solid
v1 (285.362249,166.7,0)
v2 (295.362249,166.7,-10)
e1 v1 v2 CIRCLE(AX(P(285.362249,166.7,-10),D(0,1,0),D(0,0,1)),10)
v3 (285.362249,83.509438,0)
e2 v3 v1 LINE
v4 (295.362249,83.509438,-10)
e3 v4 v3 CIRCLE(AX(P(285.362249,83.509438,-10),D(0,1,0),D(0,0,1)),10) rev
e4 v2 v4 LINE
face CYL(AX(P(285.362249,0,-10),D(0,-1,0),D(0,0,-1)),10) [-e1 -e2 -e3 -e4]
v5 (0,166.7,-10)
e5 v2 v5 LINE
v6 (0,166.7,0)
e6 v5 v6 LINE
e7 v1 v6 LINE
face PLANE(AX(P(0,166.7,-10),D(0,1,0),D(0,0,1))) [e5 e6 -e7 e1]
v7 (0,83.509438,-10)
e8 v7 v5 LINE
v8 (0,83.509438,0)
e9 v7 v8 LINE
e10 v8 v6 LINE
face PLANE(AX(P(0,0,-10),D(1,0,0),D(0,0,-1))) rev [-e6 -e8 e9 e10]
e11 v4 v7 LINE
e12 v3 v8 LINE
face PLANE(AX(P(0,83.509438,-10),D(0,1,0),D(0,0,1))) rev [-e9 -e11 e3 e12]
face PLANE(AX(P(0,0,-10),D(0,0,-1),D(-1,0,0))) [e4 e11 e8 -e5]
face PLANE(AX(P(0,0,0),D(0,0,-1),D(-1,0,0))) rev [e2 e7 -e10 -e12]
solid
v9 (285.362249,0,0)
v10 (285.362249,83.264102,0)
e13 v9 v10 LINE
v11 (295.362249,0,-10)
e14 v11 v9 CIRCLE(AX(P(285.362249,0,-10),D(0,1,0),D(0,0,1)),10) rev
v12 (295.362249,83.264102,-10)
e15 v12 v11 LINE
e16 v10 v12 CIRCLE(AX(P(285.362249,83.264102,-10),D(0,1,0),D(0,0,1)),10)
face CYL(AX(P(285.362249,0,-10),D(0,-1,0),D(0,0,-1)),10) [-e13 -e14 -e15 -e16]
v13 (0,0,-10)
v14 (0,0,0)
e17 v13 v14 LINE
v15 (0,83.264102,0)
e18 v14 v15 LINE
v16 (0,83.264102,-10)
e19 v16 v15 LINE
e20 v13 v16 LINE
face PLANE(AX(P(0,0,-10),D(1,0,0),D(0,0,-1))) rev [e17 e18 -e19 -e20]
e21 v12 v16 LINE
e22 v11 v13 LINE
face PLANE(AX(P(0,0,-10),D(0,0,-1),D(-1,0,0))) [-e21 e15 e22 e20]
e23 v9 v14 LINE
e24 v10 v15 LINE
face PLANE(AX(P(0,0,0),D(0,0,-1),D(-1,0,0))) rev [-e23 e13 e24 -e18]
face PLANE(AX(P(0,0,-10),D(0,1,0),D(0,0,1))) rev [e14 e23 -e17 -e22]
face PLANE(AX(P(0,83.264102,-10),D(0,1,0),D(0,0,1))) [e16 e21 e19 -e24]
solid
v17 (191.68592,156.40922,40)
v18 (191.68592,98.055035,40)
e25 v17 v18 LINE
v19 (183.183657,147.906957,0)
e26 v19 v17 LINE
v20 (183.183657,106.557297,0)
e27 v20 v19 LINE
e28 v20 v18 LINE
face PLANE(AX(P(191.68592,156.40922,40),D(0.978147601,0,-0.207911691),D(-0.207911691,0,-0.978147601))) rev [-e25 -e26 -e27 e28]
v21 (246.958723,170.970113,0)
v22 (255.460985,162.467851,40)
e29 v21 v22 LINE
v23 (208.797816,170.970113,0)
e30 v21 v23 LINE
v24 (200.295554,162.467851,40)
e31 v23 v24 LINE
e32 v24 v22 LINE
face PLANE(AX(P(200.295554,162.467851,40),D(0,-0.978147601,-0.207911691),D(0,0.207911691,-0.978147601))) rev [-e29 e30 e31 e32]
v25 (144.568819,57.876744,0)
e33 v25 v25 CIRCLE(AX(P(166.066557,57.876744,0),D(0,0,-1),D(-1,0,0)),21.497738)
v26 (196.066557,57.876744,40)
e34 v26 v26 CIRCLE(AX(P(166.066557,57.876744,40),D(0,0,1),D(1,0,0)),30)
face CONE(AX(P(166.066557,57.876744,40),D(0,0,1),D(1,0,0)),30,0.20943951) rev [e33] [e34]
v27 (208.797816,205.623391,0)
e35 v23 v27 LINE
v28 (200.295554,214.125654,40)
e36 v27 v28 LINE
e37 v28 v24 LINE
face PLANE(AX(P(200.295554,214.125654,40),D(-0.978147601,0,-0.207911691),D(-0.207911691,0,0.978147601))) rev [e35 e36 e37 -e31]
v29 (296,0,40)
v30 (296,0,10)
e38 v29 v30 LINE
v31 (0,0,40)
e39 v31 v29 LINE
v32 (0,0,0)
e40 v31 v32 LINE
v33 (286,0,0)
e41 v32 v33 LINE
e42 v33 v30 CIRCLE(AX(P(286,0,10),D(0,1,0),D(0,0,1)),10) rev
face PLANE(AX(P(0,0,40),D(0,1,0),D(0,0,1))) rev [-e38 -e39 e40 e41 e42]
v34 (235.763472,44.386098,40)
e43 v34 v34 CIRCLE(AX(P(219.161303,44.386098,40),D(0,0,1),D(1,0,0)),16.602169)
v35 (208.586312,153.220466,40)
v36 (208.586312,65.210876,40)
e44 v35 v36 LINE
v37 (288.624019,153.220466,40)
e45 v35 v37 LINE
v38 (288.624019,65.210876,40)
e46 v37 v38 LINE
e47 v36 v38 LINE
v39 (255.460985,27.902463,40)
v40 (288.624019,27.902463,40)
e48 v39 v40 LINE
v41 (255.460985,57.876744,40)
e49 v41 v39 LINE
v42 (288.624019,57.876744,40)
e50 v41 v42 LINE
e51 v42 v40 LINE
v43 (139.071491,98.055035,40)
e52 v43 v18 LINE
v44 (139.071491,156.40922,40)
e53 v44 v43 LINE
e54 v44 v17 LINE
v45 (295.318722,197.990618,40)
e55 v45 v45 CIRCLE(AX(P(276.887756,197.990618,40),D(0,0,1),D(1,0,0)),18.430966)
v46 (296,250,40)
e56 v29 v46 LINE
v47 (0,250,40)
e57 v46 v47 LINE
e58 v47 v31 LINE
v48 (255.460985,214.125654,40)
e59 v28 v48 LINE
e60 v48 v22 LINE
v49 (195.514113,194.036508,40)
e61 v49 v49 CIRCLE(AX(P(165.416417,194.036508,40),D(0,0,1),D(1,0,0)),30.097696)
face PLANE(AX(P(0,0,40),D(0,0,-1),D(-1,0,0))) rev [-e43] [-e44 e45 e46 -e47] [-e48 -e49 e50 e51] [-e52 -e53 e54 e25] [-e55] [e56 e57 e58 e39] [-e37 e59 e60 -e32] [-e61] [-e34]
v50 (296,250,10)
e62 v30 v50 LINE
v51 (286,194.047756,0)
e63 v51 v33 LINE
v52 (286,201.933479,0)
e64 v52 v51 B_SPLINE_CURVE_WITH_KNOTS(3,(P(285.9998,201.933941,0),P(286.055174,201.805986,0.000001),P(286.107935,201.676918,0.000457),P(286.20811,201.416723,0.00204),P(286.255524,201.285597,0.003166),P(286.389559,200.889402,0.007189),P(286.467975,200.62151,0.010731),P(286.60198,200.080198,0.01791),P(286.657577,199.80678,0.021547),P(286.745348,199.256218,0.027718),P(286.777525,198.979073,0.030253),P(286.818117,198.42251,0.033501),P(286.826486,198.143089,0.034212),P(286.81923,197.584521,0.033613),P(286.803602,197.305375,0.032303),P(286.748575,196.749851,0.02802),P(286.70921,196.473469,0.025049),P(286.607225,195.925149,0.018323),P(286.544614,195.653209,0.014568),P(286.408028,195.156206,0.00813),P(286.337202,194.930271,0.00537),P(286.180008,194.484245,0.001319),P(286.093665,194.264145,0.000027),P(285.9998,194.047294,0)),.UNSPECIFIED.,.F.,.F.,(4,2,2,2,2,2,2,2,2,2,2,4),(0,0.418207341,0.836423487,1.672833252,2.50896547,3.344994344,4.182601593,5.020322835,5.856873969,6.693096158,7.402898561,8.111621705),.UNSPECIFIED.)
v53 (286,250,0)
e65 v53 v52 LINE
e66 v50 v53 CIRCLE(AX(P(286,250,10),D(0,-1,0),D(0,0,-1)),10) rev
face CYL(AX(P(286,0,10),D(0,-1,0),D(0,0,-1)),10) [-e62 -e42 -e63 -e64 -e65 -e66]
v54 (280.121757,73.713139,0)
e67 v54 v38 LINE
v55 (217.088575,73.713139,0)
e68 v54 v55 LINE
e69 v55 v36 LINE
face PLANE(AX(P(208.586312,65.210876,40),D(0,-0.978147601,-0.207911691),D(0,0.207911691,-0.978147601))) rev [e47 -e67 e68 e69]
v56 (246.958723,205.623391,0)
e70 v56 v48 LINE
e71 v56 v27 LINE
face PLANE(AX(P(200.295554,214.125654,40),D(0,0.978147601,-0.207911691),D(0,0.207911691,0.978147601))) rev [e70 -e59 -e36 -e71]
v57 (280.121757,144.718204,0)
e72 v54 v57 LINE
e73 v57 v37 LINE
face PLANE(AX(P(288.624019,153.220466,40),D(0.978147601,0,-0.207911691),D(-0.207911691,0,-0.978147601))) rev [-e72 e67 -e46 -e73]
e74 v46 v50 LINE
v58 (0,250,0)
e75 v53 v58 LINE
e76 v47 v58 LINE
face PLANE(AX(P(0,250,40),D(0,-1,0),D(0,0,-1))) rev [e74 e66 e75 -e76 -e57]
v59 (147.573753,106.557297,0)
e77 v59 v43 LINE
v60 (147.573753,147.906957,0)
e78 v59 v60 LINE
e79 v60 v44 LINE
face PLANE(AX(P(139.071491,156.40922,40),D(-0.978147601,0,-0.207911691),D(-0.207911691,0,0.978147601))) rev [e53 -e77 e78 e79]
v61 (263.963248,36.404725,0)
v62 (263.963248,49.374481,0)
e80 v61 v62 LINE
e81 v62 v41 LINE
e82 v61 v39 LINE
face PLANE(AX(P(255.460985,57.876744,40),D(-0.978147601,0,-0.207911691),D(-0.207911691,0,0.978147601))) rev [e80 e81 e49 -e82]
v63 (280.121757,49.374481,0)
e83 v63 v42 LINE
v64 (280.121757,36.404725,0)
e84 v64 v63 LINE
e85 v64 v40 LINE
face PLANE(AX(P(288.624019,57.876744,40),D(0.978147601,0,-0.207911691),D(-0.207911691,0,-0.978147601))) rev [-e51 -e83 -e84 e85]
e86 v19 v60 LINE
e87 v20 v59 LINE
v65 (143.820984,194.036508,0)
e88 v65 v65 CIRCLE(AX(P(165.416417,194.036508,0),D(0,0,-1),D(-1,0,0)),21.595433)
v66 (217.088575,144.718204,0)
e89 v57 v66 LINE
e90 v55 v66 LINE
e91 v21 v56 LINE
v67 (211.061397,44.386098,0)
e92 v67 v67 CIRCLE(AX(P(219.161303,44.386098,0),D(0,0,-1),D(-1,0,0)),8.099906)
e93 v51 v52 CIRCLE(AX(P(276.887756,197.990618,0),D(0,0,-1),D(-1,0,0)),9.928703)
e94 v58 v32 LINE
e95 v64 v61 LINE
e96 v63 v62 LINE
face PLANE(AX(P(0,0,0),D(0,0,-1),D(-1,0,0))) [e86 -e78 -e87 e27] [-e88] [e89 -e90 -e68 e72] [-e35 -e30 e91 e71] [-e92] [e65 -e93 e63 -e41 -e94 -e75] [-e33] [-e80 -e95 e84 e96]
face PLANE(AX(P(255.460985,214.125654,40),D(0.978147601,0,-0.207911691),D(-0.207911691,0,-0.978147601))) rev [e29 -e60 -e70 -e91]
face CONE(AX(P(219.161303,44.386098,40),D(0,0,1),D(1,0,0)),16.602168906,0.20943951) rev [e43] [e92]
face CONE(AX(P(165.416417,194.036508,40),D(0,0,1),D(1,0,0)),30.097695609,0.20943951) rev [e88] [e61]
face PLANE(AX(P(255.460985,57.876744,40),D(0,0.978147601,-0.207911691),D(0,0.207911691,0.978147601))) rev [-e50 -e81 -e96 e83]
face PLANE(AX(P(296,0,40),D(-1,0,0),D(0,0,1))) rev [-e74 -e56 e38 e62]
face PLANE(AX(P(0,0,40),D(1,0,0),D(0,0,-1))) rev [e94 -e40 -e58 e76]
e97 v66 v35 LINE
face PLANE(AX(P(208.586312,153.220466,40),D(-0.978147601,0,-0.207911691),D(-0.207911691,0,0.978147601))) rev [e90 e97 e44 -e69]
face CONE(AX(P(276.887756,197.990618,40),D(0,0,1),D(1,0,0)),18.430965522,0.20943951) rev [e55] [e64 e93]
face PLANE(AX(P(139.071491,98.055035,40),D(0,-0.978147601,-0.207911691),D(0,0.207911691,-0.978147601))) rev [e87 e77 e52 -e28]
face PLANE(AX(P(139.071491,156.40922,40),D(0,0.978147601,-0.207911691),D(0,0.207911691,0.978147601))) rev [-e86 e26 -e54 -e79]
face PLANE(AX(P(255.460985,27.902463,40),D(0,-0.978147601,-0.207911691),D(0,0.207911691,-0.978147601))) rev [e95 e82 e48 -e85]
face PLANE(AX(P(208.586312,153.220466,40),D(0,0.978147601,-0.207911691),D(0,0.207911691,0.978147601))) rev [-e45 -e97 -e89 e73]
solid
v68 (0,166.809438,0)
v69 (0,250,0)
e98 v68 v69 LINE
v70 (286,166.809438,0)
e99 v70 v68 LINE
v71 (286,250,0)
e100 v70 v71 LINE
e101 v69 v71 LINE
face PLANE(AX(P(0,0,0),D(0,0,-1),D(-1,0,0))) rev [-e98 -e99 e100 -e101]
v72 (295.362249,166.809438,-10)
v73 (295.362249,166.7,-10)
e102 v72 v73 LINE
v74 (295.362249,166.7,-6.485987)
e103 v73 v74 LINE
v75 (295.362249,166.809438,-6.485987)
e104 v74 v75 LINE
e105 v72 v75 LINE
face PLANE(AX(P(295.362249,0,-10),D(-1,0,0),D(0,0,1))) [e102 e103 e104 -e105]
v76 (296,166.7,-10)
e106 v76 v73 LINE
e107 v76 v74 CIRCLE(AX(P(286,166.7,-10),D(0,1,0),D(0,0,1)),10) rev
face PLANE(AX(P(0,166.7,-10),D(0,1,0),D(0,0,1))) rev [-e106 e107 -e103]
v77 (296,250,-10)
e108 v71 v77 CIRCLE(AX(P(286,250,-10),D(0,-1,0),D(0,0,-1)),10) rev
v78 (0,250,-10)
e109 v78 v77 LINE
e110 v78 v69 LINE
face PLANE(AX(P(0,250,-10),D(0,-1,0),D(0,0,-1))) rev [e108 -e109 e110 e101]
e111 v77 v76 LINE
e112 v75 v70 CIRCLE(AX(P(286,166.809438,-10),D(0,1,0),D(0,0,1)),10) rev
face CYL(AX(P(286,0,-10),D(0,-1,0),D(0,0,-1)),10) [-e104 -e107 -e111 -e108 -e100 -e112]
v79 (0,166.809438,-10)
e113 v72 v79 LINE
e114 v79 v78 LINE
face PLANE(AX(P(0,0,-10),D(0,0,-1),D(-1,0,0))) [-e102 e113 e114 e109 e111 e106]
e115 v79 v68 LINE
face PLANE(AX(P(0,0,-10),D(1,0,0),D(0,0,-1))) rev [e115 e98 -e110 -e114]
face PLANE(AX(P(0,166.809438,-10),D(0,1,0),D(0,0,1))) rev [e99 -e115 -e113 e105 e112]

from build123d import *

# Parameters (mm, degrees)
SKETCH2_W                    = 296
SKETCH2_H                    = 250
BOSS_EXTRUDE1_DEPTH          = 40
BOSS_EXTRUDE2_DEPTH          = 10
SKETCH4_W                    = 295.362249347
SKETCH4_H                    = 83.190562337
BOSS_EXTRUDE2_2_DEPTH        = 10
SKETCH4_H_2                  = 83.264102062
BOSS_EXTRUDE2_3_DEPTH        = 10
FILLET1_R                    = 10
FILLET4_R                    = 10
FILLET5_R                    = 10
FILLET6_R                    = 10
SKETCH8_R                    = 30.097695609
CUT_EXTRUDE1_DEPTH           = 45
CUT_EXTRUDE1_DRAFT           = -12
SKETCH8_R_2                  = 30
CUT_EXTRUDE1_PROFILE_2_DEPTH = 45
CUT_EXTRUDE1_PROFILE_2_DRAFT = -12
SKETCH8_R_3                  = 18.430965522
CUT_EXTRUDE1_PROFILE_3_DEPTH = 45
CUT_EXTRUDE1_PROFILE_3_DRAFT = -12
SKETCH8_R_4                  = 16.602168906
CUT_EXTRUDE1_PROFILE_4_DEPTH = 45
CUT_EXTRUDE1_PROFILE_4_DRAFT = -12
SKETCH8_W                    = 52.614428909
SKETCH8_H                    = 58.35418479
CUT_EXTRUDE1_PROFILE_5_DEPTH = 45
CUT_EXTRUDE1_PROFILE_5_DRAFT = -12
SKETCH8_W_2                  = 80.037707008
SKETCH8_H_2                  = 88.009590175
CUT_EXTRUDE1_PROFILE_6_DEPTH = 45
CUT_EXTRUDE1_PROFILE_6_DRAFT = -12
SKETCH8_W_3                  = 55.165431523
SKETCH8_H_3                  = 51.657802929
CUT_EXTRUDE1_PROFILE_7_DEPTH = 45
CUT_EXTRUDE1_PROFILE_7_DRAFT = -12
SKETCH8_W_4                  = 33.163033979
SKETCH8_H_4                  = 29.974280712
CUT_EXTRUDE1_PROFILE_8_DEPTH = 45
CUT_EXTRUDE1_PROFILE_8_DRAFT = -12


with BuildPart() as part:
    # Sketch2 → Boss-Extrude1 (new body)
    with BuildSketch(Plane.XY):
        with Locations((148, 125)):
            Rectangle(SKETCH2_W, SKETCH2_H)
    extrude(amount=BOSS_EXTRUDE1_DEPTH)

    # Fillet1
    fillet1_edges = [part.edges().sort_by_distance(p)[0] for p in [
        (296, 125, 0),
    ]]
    fillet(fillet1_edges, radius=FILLET1_R)


with BuildPart() as body_2:
    # Sketch4 → Boss-Extrude2 (new body)
    with BuildSketch(Plane(origin=(0, 0, 0), x_dir=(-1, 0, 0), z_dir=(0, 0, -1))):
        Polygon((0, 250), (-296, 250), (-296, 166.7), (-295.362249347, 166.7), (-295.362249347, 166.809437663), (0, 166.809437663), align=None)
    extrude(amount=BOSS_EXTRUDE2_DEPTH)

    # Fillet4
    fillet4_edges = [body_2.edges().sort_by_distance(p)[0] for p in [
        (296, 208.35, 0),
    ]]
    fillet(fillet4_edges, radius=FILLET4_R - 0.0001)  # a hair under: the kernel refuses the full size


with BuildPart() as body_3:
    # Sketch4 → Boss-Extrude2 2 (new body)
    with BuildSketch(Plane(origin=(0, 0, 0), x_dir=(-1, 0, 0), z_dir=(0, 0, -1))):
        with Locations((-147.681124674, 125.104718832)):
            Rectangle(SKETCH4_W, SKETCH4_H)
    extrude(amount=BOSS_EXTRUDE2_2_DEPTH)

    # Fillet5
    fillet5_edges = [body_3.edges().sort_by_distance(p)[0] for p in [
        (295.362249347, 125.104718832, 0),
    ]]
    fillet(fillet5_edges, radius=FILLET5_R - 0.0001)  # a hair under: the kernel refuses the full size


with BuildPart() as body_4:
    # Sketch4 → Boss-Extrude2 3 (new body)
    with BuildSketch(Plane(origin=(0, 0, 0), x_dir=(-1, 0, 0), z_dir=(0, 0, -1))):
        with Locations((-147.681124674, 41.632051031)):
            Rectangle(SKETCH4_W, SKETCH4_H_2)
    extrude(amount=BOSS_EXTRUDE2_3_DEPTH)

    # Fillet6
    fillet6_edges = [body_4.edges().sort_by_distance(p)[0] for p in [
        (295.362249347, 41.632051031, 0),
    ]]
    fillet(fillet6_edges, radius=FILLET6_R - 0.0001)  # a hair under: the kernel refuses the full size


with BuildPart() as cut_extrude1_tool:
    # Sketch8 → Cut-Extrude1 (with draft: the straight prism first)
    with BuildSketch(Plane.XY.offset(40)):
        with Locations((165.416417311, 194.036508235)):
            Circle(SKETCH8_R)
    extrude(amount=-CUT_EXTRUDE1_DEPTH)
    # Cut-Extrude1: the draft: its side faces are tilted about the plane it starts from
    cut_extrude1_sides = [cut_extrude1_tool.faces().sort_by_distance(p)[0] for p in [
        (135.318721702, 194.036508235, 17.5),
    ]]
    draft(cut_extrude1_sides, Plane.XY.offset(40), CUT_EXTRUDE1_DRAFT)


with BuildPart() as part_1:
    add(part.part)

    # Cut-Extrude1: cut by cut_extrude1_tool
    add(cut_extrude1_tool.part, mode=Mode.SUBTRACT)


with BuildPart() as cut_extrude1_profile_2_tool:
    # Sketch8 → Cut-Extrude1 profile 2 (with draft: the straight prism first)
    with BuildSketch(Plane.XY.offset(40)):
        with Locations((166.066556831, 57.876743725)):
            Circle(SKETCH8_R_2)
    extrude(amount=-CUT_EXTRUDE1_PROFILE_2_DEPTH)
    # Cut-Extrude1 profile 2: the draft: its side faces are tilted about the plane it starts from
    cut_extrude1_profile_2_sides = [cut_extrude1_profile_2_tool.faces().sort_by_distance(p)[0] for p in [
        (136.066556831, 57.876743725, 17.5),
    ]]
    draft(cut_extrude1_profile_2_sides, Plane.XY.offset(40), CUT_EXTRUDE1_PROFILE_2_DRAFT)


with BuildPart() as part_2:
    add(part_1.part)

    # Cut-Extrude1 profile 2: cut by cut_extrude1_profile_2_tool
    add(cut_extrude1_profile_2_tool.part, mode=Mode.SUBTRACT)


with BuildPart() as cut_extrude1_profile_3_tool:
    # Sketch8 → Cut-Extrude1 profile 3 (with draft: the straight prism first)
    with BuildSketch(Plane.XY.offset(40)):
        with Locations((276.887756181, 197.990617675)):
            Circle(SKETCH8_R_3)
    extrude(amount=-CUT_EXTRUDE1_PROFILE_3_DEPTH)
    # Cut-Extrude1 profile 3: the draft: its side faces are tilted about the plane it starts from
    cut_extrude1_profile_3_sides = [cut_extrude1_profile_3_tool.faces().sort_by_distance(p)[0] for p in [
        (258.456790659, 197.990617675, 17.5),
    ]]
    draft(cut_extrude1_profile_3_sides, Plane.XY.offset(40), CUT_EXTRUDE1_PROFILE_3_DRAFT)


with BuildPart() as part_3:
    add(part_2.part)

    # Cut-Extrude1 profile 3: cut by cut_extrude1_profile_3_tool
    add(cut_extrude1_profile_3_tool.part, mode=Mode.SUBTRACT)


with BuildPart() as cut_extrude1_profile_4_tool:
    # Sketch8 → Cut-Extrude1 profile 4 (with draft: the straight prism first)
    with BuildSketch(Plane.XY.offset(40)):
        with Locations((219.161303371, 44.386097935)):
            Circle(SKETCH8_R_4)
    extrude(amount=-CUT_EXTRUDE1_PROFILE_4_DEPTH)
    # Cut-Extrude1 profile 4: the draft: its side faces are tilted about the plane it starts from
    cut_extrude1_profile_4_sides = [cut_extrude1_profile_4_tool.faces().sort_by_distance(p)[0] for p in [
        (202.559134465, 44.386097935, 17.5),
    ]]
    draft(cut_extrude1_profile_4_sides, Plane.XY.offset(40), CUT_EXTRUDE1_PROFILE_4_DRAFT)


with BuildPart() as part_4:
    add(part_3.part)

    # Cut-Extrude1 profile 4: cut by cut_extrude1_profile_4_tool
    add(cut_extrude1_profile_4_tool.part, mode=Mode.SUBTRACT)


with BuildPart() as cut_extrude1_profile_5_tool:
    # Sketch8 → Cut-Extrude1 profile 5 (with draft: the straight prism first)
    with BuildSketch(Plane.XY.offset(40)):
        with Locations((165.378705307, 127.232127287)):
            Rectangle(SKETCH8_W, SKETCH8_H)
    extrude(amount=-CUT_EXTRUDE1_PROFILE_5_DEPTH)
    # Cut-Extrude1 profile 5: the draft: its side faces are tilted about the plane it starts from
    cut_extrude1_profile_5_sides = [cut_extrude1_profile_5_tool.faces().sort_by_distance(p)[0] for p in [
        (139.071490852, 127.232127287, 17.5),
        (165.378705306, 98.055034892, 17.5),
        (191.685919761, 127.232127287, 17.5),
        (165.378705306, 156.409219682, 17.5),
    ]]
    draft(cut_extrude1_profile_5_sides, Plane.XY.offset(40), CUT_EXTRUDE1_PROFILE_5_DRAFT)


with BuildPart() as part_5:
    add(part_4.part)

    # Cut-Extrude1 profile 5: cut by cut_extrude1_profile_5_tool
    add(cut_extrude1_profile_5_tool.part, mode=Mode.SUBTRACT)


with BuildPart() as cut_extrude1_profile_6_tool:
    # Sketch8 → Cut-Extrude1 profile 6 (with draft: the straight prism first)
    with BuildSketch(Plane.XY.offset(40)):
        with Locations((248.605165581, 109.215671328)):
            Rectangle(SKETCH8_W_2, SKETCH8_H_2)
    extrude(amount=-CUT_EXTRUDE1_PROFILE_6_DEPTH)
    # Cut-Extrude1 profile 6: the draft: its side faces are tilted about the plane it starts from
    cut_extrude1_profile_6_sides = [cut_extrude1_profile_6_tool.faces().sort_by_distance(p)[0] for p in [
        (208.586312077, 109.215671327, 17.5),
        (248.605165581, 65.21087624, 17.5),
        (288.624019085, 109.215671327, 17.5),
        (248.605165581, 153.220466415, 17.5),
    ]]
    draft(cut_extrude1_profile_6_sides, Plane.XY.offset(40), CUT_EXTRUDE1_PROFILE_6_DRAFT)


with BuildPart() as part_6:
    add(part_5.part)

    # Cut-Extrude1 profile 6: cut by cut_extrude1_profile_6_tool
    add(cut_extrude1_profile_6_tool.part, mode=Mode.SUBTRACT)


with BuildPart() as cut_extrude1_profile_7_tool:
    # Sketch8 → Cut-Extrude1 profile 7 (with draft: the straight prism first)
    with BuildSketch(Plane.XY.offset(40)):
        with Locations((227.878269345, 188.296752355)):
            Rectangle(SKETCH8_W_3, SKETCH8_H_3)
    extrude(amount=-CUT_EXTRUDE1_PROFILE_7_DEPTH)
    # Cut-Extrude1 profile 7: the draft: its side faces are tilted about the plane it starts from
    cut_extrude1_profile_7_sides = [cut_extrude1_profile_7_tool.faces().sort_by_distance(p)[0] for p in [
        (200.295553583, 188.296752354, 17.5),
        (227.878269344, 162.46785089, 17.5),
        (255.460985106, 188.296752354, 17.5),
        (227.878269344, 214.125653819, 17.5),
    ]]
    draft(cut_extrude1_profile_7_sides, Plane.XY.offset(40), CUT_EXTRUDE1_PROFILE_7_DRAFT)


with BuildPart() as part_7:
    add(part_6.part)

    # Cut-Extrude1 profile 7: cut by cut_extrude1_profile_7_tool
    add(cut_extrude1_profile_7_tool.part, mode=Mode.SUBTRACT)


with BuildPart() as cut_extrude1_profile_8_tool:
    # Sketch8 → Cut-Extrude1 profile 8 (with draft: the straight prism first)
    with BuildSketch(Plane.XY.offset(40)):
        with Locations((272.042502096, 42.889603369)):
            Rectangle(SKETCH8_W_4, SKETCH8_H_4)
    extrude(amount=-CUT_EXTRUDE1_PROFILE_8_DEPTH)
    # Cut-Extrude1 profile 8: the draft: its side faces are tilted about the plane it starts from
    cut_extrude1_profile_8_sides = [cut_extrude1_profile_8_tool.faces().sort_by_distance(p)[0] for p in [
        (255.460985106, 42.889603369, 17.5),
        (272.042502095, 27.902463013, 17.5),
        (288.624019085, 42.889603369, 17.5),
        (272.042502095, 57.876743725, 17.5),
    ]]
    draft(cut_extrude1_profile_8_sides, Plane.XY.offset(40), CUT_EXTRUDE1_PROFILE_8_DRAFT)


with BuildPart() as part_8:
    add(part_7.part)

    # Cut-Extrude1 profile 8: cut by cut_extrude1_profile_8_tool
    add(cut_extrude1_profile_8_tool.part, mode=Mode.SUBTRACT)


solid = Compound([body_2.part, body_3.part, body_4.part, part_8.part])
